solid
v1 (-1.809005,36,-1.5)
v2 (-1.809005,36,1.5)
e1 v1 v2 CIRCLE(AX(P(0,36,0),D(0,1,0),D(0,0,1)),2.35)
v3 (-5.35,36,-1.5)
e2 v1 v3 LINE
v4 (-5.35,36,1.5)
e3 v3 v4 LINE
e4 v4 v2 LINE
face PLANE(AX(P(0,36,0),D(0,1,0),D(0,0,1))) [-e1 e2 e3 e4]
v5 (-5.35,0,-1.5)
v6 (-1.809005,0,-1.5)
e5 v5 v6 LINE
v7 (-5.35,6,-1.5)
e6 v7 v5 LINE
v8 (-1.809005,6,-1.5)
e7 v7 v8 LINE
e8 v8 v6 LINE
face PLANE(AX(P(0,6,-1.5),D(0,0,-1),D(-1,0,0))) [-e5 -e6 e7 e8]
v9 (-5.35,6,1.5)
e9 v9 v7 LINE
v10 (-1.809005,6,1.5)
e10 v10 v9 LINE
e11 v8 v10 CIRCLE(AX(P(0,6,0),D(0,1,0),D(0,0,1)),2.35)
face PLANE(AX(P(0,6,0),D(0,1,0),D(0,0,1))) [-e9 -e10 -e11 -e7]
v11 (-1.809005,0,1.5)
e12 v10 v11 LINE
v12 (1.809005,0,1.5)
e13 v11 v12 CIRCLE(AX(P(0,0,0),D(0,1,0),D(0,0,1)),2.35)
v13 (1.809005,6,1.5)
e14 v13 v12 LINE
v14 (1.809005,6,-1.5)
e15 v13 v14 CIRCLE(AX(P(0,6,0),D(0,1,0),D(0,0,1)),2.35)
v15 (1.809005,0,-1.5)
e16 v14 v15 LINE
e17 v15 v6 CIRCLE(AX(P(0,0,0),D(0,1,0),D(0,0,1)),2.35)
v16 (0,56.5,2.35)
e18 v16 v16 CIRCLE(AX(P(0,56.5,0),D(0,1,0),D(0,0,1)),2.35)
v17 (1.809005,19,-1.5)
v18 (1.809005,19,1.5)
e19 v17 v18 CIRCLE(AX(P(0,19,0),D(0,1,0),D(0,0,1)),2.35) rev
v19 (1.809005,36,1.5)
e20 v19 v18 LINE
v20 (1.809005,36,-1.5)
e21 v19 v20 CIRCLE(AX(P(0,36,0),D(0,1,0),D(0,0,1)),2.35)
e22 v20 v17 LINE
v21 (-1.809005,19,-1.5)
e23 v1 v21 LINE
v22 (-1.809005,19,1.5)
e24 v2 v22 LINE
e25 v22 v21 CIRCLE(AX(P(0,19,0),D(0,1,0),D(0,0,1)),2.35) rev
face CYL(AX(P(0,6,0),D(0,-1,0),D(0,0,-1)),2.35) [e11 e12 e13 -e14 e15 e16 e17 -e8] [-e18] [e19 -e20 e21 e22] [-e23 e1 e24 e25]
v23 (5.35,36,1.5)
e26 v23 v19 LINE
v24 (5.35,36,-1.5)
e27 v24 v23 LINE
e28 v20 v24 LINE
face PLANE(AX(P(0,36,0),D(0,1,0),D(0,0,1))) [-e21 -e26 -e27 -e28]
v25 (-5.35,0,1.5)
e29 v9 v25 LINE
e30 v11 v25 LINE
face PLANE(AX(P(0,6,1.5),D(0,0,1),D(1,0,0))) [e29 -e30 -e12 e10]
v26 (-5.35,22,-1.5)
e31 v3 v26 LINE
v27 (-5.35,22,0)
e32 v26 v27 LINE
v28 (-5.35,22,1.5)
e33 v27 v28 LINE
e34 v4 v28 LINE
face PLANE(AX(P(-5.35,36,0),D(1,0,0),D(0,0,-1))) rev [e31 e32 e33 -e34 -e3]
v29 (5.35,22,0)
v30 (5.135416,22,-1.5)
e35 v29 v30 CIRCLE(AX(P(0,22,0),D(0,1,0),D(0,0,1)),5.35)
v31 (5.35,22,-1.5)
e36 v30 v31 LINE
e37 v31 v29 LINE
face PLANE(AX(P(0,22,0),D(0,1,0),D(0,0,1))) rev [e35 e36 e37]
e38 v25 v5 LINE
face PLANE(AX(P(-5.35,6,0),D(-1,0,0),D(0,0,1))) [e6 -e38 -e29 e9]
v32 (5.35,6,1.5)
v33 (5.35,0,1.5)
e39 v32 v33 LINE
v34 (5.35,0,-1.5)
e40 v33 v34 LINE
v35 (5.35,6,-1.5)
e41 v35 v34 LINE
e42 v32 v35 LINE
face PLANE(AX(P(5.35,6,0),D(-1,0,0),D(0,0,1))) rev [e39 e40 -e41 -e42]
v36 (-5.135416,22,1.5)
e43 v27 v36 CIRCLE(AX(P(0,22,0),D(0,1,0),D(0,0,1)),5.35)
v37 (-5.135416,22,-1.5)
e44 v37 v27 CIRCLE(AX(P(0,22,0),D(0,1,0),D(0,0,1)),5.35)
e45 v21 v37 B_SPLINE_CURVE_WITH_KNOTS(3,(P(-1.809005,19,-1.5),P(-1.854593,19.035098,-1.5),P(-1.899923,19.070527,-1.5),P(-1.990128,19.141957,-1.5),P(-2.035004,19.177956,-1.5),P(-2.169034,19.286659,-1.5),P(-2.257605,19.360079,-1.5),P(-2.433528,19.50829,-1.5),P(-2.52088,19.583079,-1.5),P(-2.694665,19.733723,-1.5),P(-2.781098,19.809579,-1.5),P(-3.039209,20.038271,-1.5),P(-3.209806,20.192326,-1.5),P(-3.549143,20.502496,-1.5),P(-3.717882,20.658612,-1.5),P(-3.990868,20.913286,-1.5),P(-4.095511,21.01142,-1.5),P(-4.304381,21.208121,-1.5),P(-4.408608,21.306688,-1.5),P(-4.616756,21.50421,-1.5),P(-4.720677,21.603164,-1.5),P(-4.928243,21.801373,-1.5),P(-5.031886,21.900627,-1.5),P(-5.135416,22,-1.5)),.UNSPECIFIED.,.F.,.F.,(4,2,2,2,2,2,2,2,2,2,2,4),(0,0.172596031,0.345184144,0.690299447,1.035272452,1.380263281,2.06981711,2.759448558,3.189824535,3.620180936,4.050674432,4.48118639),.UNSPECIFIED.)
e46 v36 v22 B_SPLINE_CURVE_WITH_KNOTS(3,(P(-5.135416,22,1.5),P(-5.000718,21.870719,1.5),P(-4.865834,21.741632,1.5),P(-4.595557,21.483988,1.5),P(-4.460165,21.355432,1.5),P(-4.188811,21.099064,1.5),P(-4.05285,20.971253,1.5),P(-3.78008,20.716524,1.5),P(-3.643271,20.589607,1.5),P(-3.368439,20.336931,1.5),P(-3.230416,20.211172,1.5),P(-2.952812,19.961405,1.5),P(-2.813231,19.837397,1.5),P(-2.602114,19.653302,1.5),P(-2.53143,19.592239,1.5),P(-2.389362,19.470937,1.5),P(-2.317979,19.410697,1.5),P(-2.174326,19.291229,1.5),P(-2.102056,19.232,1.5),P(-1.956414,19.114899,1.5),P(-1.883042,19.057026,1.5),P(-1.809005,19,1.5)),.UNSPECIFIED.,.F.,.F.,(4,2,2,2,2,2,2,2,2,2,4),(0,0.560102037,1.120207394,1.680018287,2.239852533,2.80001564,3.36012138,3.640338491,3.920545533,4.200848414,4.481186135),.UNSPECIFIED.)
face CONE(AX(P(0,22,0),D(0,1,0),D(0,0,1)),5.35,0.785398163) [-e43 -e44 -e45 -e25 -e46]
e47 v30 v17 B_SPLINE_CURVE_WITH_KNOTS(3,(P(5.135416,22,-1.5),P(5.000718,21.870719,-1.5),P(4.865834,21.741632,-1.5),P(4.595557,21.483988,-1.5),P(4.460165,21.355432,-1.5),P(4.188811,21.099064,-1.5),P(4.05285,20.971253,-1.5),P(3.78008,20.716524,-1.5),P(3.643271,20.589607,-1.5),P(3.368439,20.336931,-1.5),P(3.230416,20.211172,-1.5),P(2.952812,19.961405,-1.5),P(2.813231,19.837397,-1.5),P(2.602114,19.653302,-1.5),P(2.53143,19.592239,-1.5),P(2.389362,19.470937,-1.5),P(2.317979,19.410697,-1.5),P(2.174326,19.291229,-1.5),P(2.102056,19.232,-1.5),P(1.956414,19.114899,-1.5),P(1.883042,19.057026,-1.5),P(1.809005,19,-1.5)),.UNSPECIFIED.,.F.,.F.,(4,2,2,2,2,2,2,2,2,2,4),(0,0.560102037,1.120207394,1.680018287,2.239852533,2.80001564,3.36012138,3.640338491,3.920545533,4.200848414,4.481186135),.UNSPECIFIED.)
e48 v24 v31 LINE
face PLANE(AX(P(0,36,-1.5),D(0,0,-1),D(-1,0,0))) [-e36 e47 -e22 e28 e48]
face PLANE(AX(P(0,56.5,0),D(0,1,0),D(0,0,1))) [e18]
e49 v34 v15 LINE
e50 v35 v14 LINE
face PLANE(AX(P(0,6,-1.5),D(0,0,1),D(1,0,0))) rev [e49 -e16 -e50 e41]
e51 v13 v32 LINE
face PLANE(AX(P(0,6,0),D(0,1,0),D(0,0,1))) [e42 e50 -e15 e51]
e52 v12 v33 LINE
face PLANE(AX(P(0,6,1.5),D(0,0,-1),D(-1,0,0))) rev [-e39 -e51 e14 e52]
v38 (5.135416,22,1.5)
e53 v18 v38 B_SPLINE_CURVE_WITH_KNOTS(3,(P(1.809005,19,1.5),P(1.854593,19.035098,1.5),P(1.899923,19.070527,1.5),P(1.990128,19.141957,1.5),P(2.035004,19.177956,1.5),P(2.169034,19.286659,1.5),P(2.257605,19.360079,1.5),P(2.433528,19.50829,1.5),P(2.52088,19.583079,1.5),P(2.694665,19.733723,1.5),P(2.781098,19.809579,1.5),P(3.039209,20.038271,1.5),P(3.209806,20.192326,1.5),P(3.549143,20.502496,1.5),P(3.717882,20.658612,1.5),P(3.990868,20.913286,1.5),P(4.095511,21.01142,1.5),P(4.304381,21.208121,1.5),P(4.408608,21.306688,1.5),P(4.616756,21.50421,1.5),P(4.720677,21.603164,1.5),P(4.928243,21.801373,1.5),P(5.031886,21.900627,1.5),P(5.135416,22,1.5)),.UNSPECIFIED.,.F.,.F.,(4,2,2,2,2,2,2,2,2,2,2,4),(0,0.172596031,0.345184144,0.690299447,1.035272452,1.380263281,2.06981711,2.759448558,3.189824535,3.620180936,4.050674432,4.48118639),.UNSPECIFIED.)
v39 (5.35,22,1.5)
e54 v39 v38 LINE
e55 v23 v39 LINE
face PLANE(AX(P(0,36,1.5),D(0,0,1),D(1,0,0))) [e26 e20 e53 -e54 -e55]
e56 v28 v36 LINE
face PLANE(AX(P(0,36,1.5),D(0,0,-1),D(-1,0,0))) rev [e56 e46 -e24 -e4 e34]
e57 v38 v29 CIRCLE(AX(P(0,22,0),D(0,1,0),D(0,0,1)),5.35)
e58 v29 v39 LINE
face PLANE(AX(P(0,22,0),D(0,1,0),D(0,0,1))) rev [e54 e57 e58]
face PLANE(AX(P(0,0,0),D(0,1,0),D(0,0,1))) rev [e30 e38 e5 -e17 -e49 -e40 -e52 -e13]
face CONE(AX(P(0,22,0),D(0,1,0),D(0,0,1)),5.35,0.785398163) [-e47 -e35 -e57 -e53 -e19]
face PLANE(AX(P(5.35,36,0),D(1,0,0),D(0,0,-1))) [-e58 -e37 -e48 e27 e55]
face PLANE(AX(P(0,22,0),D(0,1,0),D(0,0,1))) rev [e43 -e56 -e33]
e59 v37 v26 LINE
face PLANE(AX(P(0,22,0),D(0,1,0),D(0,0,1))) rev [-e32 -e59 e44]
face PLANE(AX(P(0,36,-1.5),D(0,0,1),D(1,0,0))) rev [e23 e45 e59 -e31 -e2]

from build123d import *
from build123d.topology import SkipClean

# Parameters (mm, degrees)
SKETCH1_R           = 2.35
BOSS_EXTRUDE1_DEPTH = 6
SKETCH2_R           = 2.35
BOSS_EXTRUDE2_DEPTH = 16
BOSS_EXTRUDE3_START = 22
SKETCH1_2_R         = 2.35
BOSS_EXTRUDE3_DEPTH = 14
BOSS_EXTRUDE4_START = 30
SKETCH2_2_R         = 2.35
BOSS_EXTRUDE4_DEPTH = 20.5
CHAMFER1_SIZE       = 3


with BuildPart() as part:
    # Sketch1 → Boss-Extrude1 (new body)
    with BuildSketch(Plane(origin=(0, 0, 0), x_dir=(1, 0, 0), z_dir=(0, 1, 0))):
        with BuildLine():
            Line((-5.35, -1.5), (-1.809005252, -1.5))
            ThreePointArc((-1.809005252, -1.5), (-2.35, 0), (-1.809005252, 1.5))
            Line((-1.809005252, 1.5), (-5.35, 1.5))
            Line((-5.35, 1.5), (-5.35, -1.5))
        make_face()
        Circle(SKETCH1_R)
        with BuildLine():
            ThreePointArc((2.35, 0), (2.210617826, -0.797288423), (1.809005252, -1.5))
            Line((1.809005252, -1.5), (5.35, -1.5))
            Line((5.35, -1.5), (5.35, 1.5))
            Line((5.35, 1.5), (1.809005252, 1.5))
            ThreePointArc((1.809005252, 1.5), (2.210617826, 0.797288423), (2.35, 0))
        make_face()
    extrude(amount=BOSS_EXTRUDE1_DEPTH)

    # Sketch2 → Boss-Extrude2 (add)
    with BuildSketch(Plane(origin=(0, 6, 0), x_dir=(1, 0, 0), z_dir=(0, 1, 0))):
        with Locations(Location((0, 0, 0), (0, 0, 39.665012908))):
            Circle(SKETCH2_R)
    extrude(amount=BOSS_EXTRUDE2_DEPTH)

    # Sketch1<2> → Boss-Extrude3 (add)
    with BuildSketch(Plane(origin=(0, 0, 0), x_dir=(1, 0, 0), z_dir=(0, 1, 0)).offset(BOSS_EXTRUDE3_START)):
        with BuildLine():
            Line((-5.35, -1.5), (-1.809005252, -1.5))
            ThreePointArc((-1.809005252, -1.5), (-2.35, 0), (-1.809005252, 1.5))
            Line((-1.809005252, 1.5), (-5.35, 1.5))
            Line((-5.35, 1.5), (-5.35, -1.5))
        make_face()
        with Locations(Location((0, 0, 0), (0, 0, 39.665012908))):
            Circle(SKETCH1_2_R)
        with BuildLine():
            ThreePointArc((2.35, 0), (2.210617826, -0.797288423), (1.809005252, -1.5))
            Line((1.809005252, -1.5), (5.35, -1.5))
            Line((5.35, -1.5), (5.35, 1.5))
            Line((5.35, 1.5), (1.809005252, 1.5))
            ThreePointArc((1.809005252, 1.5), (2.210617826, 0.797288423), (2.35, 0))
        make_face()
    extrude(amount=BOSS_EXTRUDE3_DEPTH)

    # Sketch2<2> → Boss-Extrude4 (add)
    with SkipClean():  # the faces are left unmerged after this step: merging them gives an invalid solid
        with BuildSketch(Plane(origin=(0, 6, 0), x_dir=(1, 0, 0), z_dir=(0, 1, 0)).offset(BOSS_EXTRUDE4_START)):
            with Locations(Location((0, 0, 0), (0, 0, 39.665012908))):
                Circle(SKETCH2_2_R)
        extrude(amount=BOSS_EXTRUDE4_DEPTH)

    # Chamfer1
    # the kernel refuses this chamfer: 3 mm, written as the material it adds along each edge
    with BuildSketch(Plane(origin=(0, 22, 0), x_dir=(-0.9999950652018471, 0, 0.003141587489430323), z_dir=(-0.003141587489430323, 0, -0.9999950652018471))) as chamfer1_piece_1_section:
        Polygon((2.35, -CHAMFER1_SIZE), (2.35 + CHAMFER1_SIZE, 0), (2.35, 0), align=None)
    chamfer1_piece_1 = revolve(axis=Axis((0, 22, 0), (0, 1, 0)), revolution_arc=359.64, mode=Mode.PRIVATE)
    chamfer1_piece_1 = split(chamfer1_piece_1, bisect_by=Plane(origin=(-3.19448265, 21.00212183, 1.5), z_dir=(0, 0, -1)), keep=Keep.TOP, mode=Mode.PRIVATE)
    chamfer1_piece_1 = split(chamfer1_piece_1, bisect_by=Plane(origin=(-3.19448265, 21.00212183, -1.5), z_dir=(0, 0, 1)), keep=Keep.TOP, mode=Mode.PRIVATE)
    chamfer1_piece_1 = split(chamfer1_piece_1, bisect_by=Plane(origin=(5.35, 21.00212183, 0.771950274), z_dir=(-1, 0, 0)), keep=Keep.TOP, mode=Mode.PRIVATE)
    add(chamfer1_piece_1)
    with BuildSketch(Plane(origin=(0, 22, 0), x_dir=(0.9999950652018581, 0, -0.0031415874858800653), z_dir=(0.0031415874858800653, 0, 0.9999950652018581))) as chamfer1_piece_2_section:
        Polygon((2.35, -CHAMFER1_SIZE), (2.35 + CHAMFER1_SIZE, 0), (2.35, 0), align=None)
    chamfer1_piece_2 = revolve(axis=Axis((0, 22, 0), (0, 1, 0)), revolution_arc=359.64, mode=Mode.PRIVATE)
    chamfer1_piece_2 = split(chamfer1_piece_2, bisect_by=Plane(origin=(3.19448265, 21.00212183, 1.5), z_dir=(0, 0, -1)), keep=Keep.TOP, mode=Mode.PRIVATE)
    chamfer1_piece_2 = split(chamfer1_piece_2, bisect_by=Plane(origin=(3.19448265, 21.00212183, -1.5), z_dir=(0, 0, 1)), keep=Keep.TOP, mode=Mode.PRIVATE)
    chamfer1_piece_2 = split(chamfer1_piece_2, bisect_by=Plane(origin=(-5.35, 21.00212183, -0.771950274), z_dir=(1, 0, 0)), keep=Keep.TOP, mode=Mode.PRIVATE)
    add(chamfer1_piece_2)


solid = part.part
